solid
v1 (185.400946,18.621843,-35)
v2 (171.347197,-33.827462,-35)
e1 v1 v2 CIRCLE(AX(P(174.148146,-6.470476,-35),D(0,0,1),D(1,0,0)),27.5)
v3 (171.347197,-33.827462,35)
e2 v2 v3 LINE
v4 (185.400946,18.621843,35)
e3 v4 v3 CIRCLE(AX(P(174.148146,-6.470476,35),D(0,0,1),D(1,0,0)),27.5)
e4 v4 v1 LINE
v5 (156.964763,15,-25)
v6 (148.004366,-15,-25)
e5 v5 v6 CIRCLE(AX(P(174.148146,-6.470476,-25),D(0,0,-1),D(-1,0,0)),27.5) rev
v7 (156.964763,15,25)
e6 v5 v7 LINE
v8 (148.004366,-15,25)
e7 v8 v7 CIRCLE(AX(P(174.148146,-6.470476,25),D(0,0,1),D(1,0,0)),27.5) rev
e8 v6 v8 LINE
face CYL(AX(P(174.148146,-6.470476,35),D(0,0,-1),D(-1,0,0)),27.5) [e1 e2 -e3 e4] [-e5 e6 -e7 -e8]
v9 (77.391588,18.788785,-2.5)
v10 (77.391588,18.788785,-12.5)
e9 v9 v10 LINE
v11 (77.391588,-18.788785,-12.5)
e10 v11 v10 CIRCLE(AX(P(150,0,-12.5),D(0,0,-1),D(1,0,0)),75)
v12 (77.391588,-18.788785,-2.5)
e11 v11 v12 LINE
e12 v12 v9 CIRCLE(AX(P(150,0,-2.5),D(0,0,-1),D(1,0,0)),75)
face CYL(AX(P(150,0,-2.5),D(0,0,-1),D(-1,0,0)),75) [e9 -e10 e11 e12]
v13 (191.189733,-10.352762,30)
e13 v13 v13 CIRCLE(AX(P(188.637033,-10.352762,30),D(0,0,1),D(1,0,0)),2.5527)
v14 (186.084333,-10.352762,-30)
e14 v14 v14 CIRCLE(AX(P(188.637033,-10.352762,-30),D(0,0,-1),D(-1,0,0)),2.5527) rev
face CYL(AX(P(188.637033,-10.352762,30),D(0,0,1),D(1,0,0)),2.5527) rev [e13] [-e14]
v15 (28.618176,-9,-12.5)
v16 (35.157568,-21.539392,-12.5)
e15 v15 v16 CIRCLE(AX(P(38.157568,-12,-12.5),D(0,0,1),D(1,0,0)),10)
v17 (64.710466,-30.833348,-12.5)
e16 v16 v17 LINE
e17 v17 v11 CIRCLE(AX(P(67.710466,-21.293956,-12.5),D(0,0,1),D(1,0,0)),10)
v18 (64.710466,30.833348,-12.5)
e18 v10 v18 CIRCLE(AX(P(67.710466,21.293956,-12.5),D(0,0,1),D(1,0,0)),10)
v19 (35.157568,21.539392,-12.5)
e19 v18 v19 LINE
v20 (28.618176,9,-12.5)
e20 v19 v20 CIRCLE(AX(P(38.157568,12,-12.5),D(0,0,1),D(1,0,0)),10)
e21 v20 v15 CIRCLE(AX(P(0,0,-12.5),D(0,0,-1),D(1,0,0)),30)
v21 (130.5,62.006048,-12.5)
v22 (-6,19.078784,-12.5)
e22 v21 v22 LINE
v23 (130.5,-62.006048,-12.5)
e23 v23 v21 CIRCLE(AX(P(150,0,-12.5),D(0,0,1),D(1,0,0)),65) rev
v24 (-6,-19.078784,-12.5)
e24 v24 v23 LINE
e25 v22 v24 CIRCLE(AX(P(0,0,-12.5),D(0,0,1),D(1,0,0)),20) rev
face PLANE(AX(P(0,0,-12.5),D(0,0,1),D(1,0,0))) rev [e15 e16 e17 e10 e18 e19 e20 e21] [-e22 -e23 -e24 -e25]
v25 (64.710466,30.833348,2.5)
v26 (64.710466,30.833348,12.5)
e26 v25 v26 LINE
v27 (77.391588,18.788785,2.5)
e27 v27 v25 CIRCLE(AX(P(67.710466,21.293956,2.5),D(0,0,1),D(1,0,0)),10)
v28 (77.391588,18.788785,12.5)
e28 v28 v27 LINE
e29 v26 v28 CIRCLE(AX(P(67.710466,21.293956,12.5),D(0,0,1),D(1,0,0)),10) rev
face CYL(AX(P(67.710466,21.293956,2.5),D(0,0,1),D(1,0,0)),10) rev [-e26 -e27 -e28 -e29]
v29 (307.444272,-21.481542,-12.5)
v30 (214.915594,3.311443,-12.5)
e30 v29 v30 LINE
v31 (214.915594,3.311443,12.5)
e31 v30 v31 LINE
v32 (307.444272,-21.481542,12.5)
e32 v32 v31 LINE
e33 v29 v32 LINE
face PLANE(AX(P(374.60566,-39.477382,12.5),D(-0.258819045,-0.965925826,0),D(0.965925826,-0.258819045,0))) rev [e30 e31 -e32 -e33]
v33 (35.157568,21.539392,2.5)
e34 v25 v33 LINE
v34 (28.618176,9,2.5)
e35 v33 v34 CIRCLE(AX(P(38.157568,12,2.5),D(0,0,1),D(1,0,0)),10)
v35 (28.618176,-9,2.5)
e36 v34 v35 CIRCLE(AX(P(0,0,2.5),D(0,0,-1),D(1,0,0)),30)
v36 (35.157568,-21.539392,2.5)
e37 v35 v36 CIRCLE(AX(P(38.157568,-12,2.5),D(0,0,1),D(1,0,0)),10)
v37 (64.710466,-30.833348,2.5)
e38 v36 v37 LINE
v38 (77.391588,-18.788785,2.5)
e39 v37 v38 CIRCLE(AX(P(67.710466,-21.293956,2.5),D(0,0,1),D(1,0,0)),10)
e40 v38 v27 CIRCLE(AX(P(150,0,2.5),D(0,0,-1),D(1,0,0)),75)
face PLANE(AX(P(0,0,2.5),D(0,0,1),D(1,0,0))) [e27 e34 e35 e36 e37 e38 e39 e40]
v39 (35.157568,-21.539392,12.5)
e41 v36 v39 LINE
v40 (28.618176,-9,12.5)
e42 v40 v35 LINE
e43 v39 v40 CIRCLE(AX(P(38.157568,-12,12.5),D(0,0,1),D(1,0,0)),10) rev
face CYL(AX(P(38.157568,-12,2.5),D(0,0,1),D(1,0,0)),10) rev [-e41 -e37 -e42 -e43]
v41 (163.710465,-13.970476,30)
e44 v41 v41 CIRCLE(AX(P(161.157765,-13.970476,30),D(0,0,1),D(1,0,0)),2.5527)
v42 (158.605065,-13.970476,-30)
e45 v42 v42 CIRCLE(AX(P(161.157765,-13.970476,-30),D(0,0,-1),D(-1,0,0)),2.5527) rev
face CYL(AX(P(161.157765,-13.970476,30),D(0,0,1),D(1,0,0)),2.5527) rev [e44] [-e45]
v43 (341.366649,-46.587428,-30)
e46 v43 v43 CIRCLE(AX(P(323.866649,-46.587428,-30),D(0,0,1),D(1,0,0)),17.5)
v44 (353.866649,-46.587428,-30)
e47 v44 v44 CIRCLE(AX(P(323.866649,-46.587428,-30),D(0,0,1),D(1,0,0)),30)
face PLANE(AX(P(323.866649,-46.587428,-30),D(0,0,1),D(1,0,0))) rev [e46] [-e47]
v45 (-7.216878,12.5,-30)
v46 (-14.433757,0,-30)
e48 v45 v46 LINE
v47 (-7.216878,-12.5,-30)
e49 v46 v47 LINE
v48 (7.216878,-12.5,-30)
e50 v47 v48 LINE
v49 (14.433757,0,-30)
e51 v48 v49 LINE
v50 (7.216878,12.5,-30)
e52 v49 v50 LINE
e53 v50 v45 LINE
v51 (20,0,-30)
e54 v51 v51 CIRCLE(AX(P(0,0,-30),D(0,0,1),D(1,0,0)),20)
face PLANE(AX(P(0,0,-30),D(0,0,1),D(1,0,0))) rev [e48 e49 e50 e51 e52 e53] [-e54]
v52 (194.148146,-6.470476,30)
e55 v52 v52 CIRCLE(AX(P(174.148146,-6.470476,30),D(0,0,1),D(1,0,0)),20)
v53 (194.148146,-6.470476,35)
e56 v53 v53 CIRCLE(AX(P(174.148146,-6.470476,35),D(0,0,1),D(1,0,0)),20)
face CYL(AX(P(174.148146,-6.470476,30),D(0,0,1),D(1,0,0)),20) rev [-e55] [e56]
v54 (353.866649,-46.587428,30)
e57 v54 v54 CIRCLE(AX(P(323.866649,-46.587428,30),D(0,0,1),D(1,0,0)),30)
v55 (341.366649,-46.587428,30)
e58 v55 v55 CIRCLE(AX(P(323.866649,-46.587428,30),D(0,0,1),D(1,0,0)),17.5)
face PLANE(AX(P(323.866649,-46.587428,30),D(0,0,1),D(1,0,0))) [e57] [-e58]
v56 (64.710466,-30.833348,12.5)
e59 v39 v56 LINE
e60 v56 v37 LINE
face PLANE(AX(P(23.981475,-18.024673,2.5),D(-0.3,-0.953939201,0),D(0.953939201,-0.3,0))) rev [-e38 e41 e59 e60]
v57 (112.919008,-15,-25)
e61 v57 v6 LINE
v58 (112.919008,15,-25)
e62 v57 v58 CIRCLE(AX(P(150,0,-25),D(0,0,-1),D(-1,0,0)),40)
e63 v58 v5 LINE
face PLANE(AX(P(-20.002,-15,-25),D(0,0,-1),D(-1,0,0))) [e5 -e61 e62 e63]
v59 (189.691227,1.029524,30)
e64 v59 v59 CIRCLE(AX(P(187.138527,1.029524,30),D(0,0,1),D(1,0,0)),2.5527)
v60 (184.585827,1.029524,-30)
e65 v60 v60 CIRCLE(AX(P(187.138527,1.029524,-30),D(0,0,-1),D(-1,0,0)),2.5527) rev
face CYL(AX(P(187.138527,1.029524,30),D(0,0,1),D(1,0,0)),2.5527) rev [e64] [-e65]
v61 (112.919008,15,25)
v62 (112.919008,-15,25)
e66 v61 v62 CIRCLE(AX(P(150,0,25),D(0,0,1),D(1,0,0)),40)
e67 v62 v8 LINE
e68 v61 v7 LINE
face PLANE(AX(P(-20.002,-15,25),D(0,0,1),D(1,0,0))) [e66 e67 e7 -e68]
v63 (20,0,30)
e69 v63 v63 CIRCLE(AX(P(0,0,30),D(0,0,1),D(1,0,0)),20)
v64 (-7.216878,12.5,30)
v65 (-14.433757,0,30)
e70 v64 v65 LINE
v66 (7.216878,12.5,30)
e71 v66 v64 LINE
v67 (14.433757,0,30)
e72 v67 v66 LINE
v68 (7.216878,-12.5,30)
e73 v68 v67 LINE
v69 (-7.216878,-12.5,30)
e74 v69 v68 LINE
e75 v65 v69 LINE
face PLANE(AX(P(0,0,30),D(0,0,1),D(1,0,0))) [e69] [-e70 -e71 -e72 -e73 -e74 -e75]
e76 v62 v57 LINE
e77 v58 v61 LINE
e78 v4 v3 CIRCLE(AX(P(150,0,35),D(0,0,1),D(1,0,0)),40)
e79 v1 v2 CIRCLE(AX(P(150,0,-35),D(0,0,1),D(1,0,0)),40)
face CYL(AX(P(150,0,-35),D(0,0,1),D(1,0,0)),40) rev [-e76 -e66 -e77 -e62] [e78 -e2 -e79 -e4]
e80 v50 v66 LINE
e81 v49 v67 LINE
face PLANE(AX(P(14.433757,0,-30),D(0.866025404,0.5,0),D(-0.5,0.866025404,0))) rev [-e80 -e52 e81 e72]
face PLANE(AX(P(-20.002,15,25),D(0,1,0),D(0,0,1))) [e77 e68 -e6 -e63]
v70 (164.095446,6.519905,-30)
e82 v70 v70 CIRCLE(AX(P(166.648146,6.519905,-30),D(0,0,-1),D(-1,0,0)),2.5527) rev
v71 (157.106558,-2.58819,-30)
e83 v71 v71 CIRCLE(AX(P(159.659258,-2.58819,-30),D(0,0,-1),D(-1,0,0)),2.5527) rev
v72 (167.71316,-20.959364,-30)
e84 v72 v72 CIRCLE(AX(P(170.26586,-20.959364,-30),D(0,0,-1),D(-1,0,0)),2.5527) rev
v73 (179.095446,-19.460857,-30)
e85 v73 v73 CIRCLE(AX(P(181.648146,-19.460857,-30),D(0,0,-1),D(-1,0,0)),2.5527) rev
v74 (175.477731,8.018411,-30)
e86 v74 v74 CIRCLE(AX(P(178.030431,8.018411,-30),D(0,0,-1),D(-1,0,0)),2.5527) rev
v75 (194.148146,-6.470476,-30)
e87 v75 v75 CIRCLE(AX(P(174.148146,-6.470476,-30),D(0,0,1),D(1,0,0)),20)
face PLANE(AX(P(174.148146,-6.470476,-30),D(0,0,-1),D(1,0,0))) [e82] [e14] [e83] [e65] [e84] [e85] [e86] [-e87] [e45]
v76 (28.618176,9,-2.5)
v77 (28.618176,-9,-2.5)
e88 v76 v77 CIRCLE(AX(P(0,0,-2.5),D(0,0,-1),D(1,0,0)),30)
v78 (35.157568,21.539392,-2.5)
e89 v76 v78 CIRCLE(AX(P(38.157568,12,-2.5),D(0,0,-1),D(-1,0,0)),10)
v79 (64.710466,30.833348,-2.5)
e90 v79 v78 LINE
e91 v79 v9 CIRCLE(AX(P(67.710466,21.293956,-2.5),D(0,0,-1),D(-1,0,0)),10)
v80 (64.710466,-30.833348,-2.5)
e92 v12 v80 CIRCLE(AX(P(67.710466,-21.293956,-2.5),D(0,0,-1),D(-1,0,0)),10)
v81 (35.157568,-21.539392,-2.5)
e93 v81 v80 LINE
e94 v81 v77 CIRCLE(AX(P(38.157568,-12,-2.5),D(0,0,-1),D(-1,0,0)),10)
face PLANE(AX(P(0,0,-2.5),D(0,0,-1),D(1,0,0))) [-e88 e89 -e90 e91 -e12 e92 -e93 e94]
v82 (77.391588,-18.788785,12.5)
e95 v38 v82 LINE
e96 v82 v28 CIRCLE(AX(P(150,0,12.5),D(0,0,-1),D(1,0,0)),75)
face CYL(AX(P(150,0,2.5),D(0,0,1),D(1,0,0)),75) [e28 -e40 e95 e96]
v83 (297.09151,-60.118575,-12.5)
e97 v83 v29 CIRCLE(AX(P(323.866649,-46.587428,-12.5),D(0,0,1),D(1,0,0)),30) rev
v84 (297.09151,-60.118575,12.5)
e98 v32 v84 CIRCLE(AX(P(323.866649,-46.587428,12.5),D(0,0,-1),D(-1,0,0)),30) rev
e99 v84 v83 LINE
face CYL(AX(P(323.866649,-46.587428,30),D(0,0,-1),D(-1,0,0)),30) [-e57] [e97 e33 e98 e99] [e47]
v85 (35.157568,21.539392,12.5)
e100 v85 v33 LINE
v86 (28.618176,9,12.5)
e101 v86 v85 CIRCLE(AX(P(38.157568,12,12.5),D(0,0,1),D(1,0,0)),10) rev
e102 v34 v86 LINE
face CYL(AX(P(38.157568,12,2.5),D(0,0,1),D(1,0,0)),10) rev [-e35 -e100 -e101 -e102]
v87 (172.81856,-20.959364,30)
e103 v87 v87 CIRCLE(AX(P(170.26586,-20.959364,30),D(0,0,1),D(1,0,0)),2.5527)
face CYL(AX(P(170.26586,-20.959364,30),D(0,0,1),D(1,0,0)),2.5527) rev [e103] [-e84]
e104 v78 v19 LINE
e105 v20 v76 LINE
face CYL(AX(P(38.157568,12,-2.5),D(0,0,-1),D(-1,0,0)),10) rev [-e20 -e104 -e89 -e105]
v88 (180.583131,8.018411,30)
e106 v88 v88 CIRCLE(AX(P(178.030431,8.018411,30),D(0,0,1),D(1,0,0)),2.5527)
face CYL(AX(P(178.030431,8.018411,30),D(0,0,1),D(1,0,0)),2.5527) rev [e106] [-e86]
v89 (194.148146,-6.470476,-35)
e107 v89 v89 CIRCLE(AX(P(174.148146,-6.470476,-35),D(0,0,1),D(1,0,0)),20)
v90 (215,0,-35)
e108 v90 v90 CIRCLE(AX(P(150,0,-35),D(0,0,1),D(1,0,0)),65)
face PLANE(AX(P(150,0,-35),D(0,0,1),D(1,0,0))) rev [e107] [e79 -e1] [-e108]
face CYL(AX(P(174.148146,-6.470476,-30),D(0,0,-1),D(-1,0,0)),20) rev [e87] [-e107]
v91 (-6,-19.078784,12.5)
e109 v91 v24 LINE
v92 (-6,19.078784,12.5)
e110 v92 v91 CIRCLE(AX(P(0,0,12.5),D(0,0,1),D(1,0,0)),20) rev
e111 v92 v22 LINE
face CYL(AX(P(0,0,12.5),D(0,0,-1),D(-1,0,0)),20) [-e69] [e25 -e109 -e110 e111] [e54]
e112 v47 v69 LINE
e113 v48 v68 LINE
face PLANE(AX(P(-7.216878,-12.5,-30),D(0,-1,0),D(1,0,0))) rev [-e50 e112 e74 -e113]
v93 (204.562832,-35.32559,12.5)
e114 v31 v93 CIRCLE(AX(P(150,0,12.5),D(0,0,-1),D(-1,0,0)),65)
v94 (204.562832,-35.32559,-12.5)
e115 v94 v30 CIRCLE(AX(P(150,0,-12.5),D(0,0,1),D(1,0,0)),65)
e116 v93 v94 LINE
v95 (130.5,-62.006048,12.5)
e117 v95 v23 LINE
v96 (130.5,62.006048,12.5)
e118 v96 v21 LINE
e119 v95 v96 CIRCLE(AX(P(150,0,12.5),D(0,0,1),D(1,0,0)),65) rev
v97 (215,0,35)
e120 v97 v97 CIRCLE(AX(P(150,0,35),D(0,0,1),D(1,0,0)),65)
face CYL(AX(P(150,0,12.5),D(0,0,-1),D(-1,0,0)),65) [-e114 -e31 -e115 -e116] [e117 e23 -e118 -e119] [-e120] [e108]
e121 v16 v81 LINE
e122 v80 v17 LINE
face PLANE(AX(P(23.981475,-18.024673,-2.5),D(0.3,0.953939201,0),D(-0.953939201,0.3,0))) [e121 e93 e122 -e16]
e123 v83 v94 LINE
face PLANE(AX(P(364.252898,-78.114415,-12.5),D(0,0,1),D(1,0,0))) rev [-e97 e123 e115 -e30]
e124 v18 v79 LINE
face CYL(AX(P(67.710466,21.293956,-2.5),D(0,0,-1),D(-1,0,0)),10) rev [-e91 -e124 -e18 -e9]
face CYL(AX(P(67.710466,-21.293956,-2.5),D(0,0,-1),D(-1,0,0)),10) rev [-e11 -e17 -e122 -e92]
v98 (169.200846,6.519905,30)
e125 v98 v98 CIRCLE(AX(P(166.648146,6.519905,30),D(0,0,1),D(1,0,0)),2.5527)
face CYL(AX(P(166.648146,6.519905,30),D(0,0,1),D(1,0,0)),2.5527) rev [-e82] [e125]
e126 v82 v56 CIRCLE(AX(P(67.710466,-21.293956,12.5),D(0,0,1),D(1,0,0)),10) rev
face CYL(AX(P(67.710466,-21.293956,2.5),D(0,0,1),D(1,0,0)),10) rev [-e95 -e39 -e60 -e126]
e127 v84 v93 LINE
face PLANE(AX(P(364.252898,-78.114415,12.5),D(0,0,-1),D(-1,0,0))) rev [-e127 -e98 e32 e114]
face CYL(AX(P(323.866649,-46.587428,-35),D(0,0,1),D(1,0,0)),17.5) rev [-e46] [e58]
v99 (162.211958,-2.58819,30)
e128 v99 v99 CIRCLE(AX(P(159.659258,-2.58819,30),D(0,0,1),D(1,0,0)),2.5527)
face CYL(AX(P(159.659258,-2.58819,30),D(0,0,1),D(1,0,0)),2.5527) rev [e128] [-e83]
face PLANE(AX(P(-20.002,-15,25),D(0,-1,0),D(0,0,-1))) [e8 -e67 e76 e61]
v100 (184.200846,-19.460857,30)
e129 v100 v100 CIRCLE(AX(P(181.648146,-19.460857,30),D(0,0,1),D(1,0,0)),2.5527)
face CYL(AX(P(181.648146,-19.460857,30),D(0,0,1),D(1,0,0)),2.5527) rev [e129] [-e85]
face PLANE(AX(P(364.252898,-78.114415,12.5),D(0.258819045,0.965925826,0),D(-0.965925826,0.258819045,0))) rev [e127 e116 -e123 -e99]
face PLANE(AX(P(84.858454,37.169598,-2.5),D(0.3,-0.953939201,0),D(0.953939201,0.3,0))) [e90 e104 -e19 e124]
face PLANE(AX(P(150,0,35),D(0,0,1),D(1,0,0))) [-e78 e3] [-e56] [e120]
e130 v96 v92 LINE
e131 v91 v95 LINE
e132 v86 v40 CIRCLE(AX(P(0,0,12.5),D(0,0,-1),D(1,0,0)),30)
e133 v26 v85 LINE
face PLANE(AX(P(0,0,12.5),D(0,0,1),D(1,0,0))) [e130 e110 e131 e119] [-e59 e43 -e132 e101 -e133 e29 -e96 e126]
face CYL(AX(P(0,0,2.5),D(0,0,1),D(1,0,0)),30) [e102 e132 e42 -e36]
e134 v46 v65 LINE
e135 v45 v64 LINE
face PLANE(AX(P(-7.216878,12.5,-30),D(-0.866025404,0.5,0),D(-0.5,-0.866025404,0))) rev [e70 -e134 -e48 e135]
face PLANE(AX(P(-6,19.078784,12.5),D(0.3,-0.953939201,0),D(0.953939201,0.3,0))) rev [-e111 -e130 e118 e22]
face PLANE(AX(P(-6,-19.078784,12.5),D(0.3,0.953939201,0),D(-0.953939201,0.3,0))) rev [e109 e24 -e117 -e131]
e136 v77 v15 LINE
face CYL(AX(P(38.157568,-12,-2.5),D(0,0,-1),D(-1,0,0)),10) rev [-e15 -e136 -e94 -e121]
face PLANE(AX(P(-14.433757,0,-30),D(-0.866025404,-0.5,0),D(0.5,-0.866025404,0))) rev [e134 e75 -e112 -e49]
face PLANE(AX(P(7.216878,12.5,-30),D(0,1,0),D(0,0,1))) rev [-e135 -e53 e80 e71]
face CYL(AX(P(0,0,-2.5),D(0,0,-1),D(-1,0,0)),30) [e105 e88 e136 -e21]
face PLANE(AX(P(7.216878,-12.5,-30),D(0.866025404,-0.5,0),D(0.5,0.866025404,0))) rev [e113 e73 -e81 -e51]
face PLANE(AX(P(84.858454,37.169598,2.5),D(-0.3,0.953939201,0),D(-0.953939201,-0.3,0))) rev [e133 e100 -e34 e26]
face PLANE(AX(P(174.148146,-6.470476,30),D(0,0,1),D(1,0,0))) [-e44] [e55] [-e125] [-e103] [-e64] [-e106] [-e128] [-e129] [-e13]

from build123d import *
from build123d.topology import SkipClean

# Parameters (mm, degrees)
LEFT_ARM_DEPTH                = 12.5
SKETCH2_R                     = 20
LEFT_BOSS_DEPTH               = 30
LEFT_HEX_DEPTH                = 233.486558751
LEFT_HEX_DEPTH_BACK           = 233.486558751
SKETCH3_R                     = 65
CENTRE_BOSS_DEPTH             = 35
SKETCH5_W                     = 25
SKETCH5_H                     = 40
RIGHT_ARM_DEPTH               = 180
SKETCH7_R                     = 30
RIGHT_BOSS_DEPTH              = 30
SKETCH8_R                     = 17.5
RIGHT_BOSS_HOLE_DEPTH         = 368.848119787
SKETCH9_R                     = 40
CENTRE_HOLE_DEPTH             = 369.764476639
SKETCH10_R                    = 27.5
CENTRE_BLOB_DEPTH             = 35
CENTRE_BEAM_REACH             = 222.573
SKETCH11_W                    = 50
SKETCH11_H                    = 30
CENTRE_BEAM_DIRECTION_2_REACH = 222.573
SKETCH12_R                    = 20
CUT_EXTRUDE4_DEPTH            = 5
F_1_4_20_TAPPED_HOLE1_D       = 5.1054
CIRPATTERN1_COUNT             = 8
CUT_OUT_DEPTH                 = 10
FILLET1_R                     = 10
FILLET1_OF_MIRROR2_R          = 10


with BuildPart() as part:
    # Sketch1 → LEFT_ARM (new, symmetric)
    with BuildSketch(Plane.XY):
        with BuildLine():
            Line((-6, 19.078784028), (130.5, 62.006048092))
            ThreePointArc((130.5, 62.006048092), (215, 0), (130.5, -62.006048092))
            Line((130.5, -62.006048092), (-6, -19.078784028))
            ThreePointArc((-6, -19.078784028), (-20, 0), (-6, 19.078784028))
        make_face()
    extrude(amount=LEFT_ARM_DEPTH, both=True)

    # Sketch2 → LEFT_Boss (add, symmetric)
    with SkipClean():  # the faces are left unmerged after this step: merging them gives an invalid solid
        with BuildSketch(Plane.XY):
            Circle(SKETCH2_R)
        extrude(amount=LEFT_BOSS_DEPTH, both=True)

    # Sketch4 → LEFT_Hex (cut, two sides: drawn at the far end of the back side and taken through both)
    with SkipClean():  # the faces are left unmerged after this step: merging them gives an invalid solid
        with BuildSketch(Plane.XY.offset(30).offset(-LEFT_HEX_DEPTH_BACK)):
            Polygon((14.43375673, 0), (7.216878365, 12.5), (-7.216878365, 12.5), (-14.43375673, 0), (-7.216878365, -12.5), (7.216878365, -12.5), align=None)
        extrude(amount=LEFT_HEX_DEPTH + LEFT_HEX_DEPTH_BACK, mode=Mode.SUBTRACT)

    # Sketch3 → CENTRE_Boss (add, symmetric)
    with SkipClean():  # the faces are left unmerged after this step: merging them gives an invalid solid
        with BuildSketch(Plane.XY):
            with Locations((150, 0)):
                Circle(SKETCH3_R)
        extrude(amount=CENTRE_BOSS_DEPTH, both=True)

    # Sketch5 → RIGHT_ARM (add)
    with SkipClean():  # the faces are left unmerged after this step: merging them gives an invalid solid
        with BuildSketch(Plane(origin=(139.951905284, -37.5, 0), x_dir=(0, 0, -1), z_dir=(0.9659258262890681, -0.25881904510252135, 0))):
            with Locations((0, 38.822856765)):
                Rectangle(SKETCH5_W, SKETCH5_H)
        extrude(amount=RIGHT_ARM_DEPTH)

    # Sketch7 → RIGHT_Boss (add, symmetric)
    with SkipClean():  # the faces are left unmerged after this step: merging them gives an invalid solid
        with BuildSketch(Plane.XY):
            with Locations((323.866648732, -46.587428118)):
                Circle(SKETCH7_R)
        extrude(amount=RIGHT_BOSS_DEPTH, both=True)
    add(part.part.scale(1), mode=Mode.REPLACE)  # the faces are merged on a copy

    # Sketch8 → RIGHT_Boss_Hole (cut, through all)
    with BuildSketch(Plane.XY.offset(30)):
        with Locations((323.866648732, -46.587428118)):
            Circle(SKETCH8_R)
    extrude(amount=-RIGHT_BOSS_HOLE_DEPTH, mode=Mode.SUBTRACT)

    # Sketch9 → CENTRE_Hole (cut, through all)
    with BuildSketch(Plane.XY.offset(35)):
        with Locations((150, 0)):
            Circle(SKETCH9_R)
    extrude(amount=-CENTRE_HOLE_DEPTH, mode=Mode.SUBTRACT)

    # Sketch10 → CENTRE_Blob (add, symmetric)
    with SkipClean():  # the faces are left unmerged after this step: merging them gives an invalid solid
        with BuildSketch(Plane.XY):
            with Locations((174.148145657, -6.470476128)):
                Circle(SKETCH10_R)
        extrude(amount=CENTRE_BLOB_DEPTH, both=True)

    # Sketch11 → CENTRE_Beam (add, up to next)
    with BuildSketch(Plane(origin=(150, 0, 0), x_dir=(0, 0, -1), z_dir=(1, 0, 0)), mode=Mode.PRIVATE) as centre_beam_sk1:
        Rectangle(SKETCH11_W, SKETCH11_H)
    centre_beam_tool1 = extrude(centre_beam_sk1.sketch, amount=CENTRE_BEAM_REACH, mode=Mode.PRIVATE) - part.part
    add(centre_beam_tool1.solids().sort_by_distance((150, 0, 0))[0])

    # Sketch11 → CENTRE_Beam direction 2 (add, up to next)
    with BuildSketch(Plane(origin=(150, 0, 0), x_dir=(0, 0, -1), z_dir=(1, 0, 0)), mode=Mode.PRIVATE) as centre_beam_direction_2_sk1:
        Rectangle(SKETCH11_W, SKETCH11_H)
    centre_beam_direction_2_tool1 = extrude(centre_beam_direction_2_sk1.sketch, amount=-CENTRE_BEAM_DIRECTION_2_REACH, mode=Mode.PRIVATE) - part.part
    add(centre_beam_direction_2_tool1.solids().sort_by_distance((150, 0, 0))[0])

    # Sketch12 → Cut-Extrude4 (cut)
    with BuildSketch(Plane.XY.offset(35)):
        with Locations((174.148145657, -6.470476128)):
            Circle(SKETCH12_R)
    cut_extrude4 = extrude(amount=-CUT_EXTRUDE4_DEPTH, mode=Mode.SUBTRACT)

    # 1/4-20 Tapped Hole1 (through all)
    with Locations(Plane.XY.offset(30)):
        with Locations((159.659258263, -2.588190451)):
            f_1_4_20_tapped_hole1 = Hole(F_1_4_20_TAPPED_HOLE1_D / 2)

    # CirPattern1: 1/4-20 Tapped Hole1 ×8 about axis
    cirpattern1_axis = Axis((174.148145657, -6.470476128, 0), (0, 0, 1))
    for i in range(1, CIRPATTERN1_COUNT):
        add(f_1_4_20_tapped_hole1.rotate(cirpattern1_axis, i * 360 / CIRPATTERN1_COUNT), mode=Mode.SUBTRACT)

    # Mirror1: Cut-Extrude4 across plane
    add(cut_extrude4.mirror(Plane.XY), mode=Mode.SUBTRACT)

    # Sketch15 → Cut_OUT (cut)
    with BuildSketch(Plane.XY.offset(12.5)):
        with BuildLine():
            Line((84.858453972, 37.169597537), (23.981475126, 18.024673388))
            ThreePointArc((23.981475126, 18.024673388), (30, 0), (23.981475126, -18.024673388))
            Line((23.981475126, -18.024673388), (84.858453972, -37.169597537))
            ThreePointArc((84.858453972, -37.169597537), (75, 0), (84.858453972, 37.169597537))
        make_face()
    cut_out = extrude(amount=-CUT_OUT_DEPTH, mode=Mode.SUBTRACT)

    # Fillet1
    fillet1_edges = [part.edges().sort_by_distance(p)[0] for p in [
        (23.981475126, -18.024673388, 7.5),
        (23.981475126, 18.024673388, 7.5),
        (84.858453972, 37.169597537, 7.5),
        (84.858453972, -37.169597537, 7.5),
    ]]
    fillet(fillet1_edges, radius=FILLET1_R)

    # Mirror2: Cut_OUT across plane
    with SkipClean():  # the faces are left unmerged after this step: merging them gives an invalid solid
        add(cut_out.mirror(Plane.XY), mode=Mode.SUBTRACT)

    # Fillet1 of Mirror2
    fillet1_of_mirror2_edges = [part.edges().sort_by_distance(p)[0] for p in [
        (23.981475126, -18.024673388, -7.5),
        (23.981475126, 18.024673388, -7.5),
        (84.858453972, 37.169597537, -7.5),
        (84.858453972, -37.169597537, -7.5),
    ]]
    fillet(fillet1_of_mirror2_edges, radius=FILLET1_OF_MIRROR2_R)


solid = part.part
